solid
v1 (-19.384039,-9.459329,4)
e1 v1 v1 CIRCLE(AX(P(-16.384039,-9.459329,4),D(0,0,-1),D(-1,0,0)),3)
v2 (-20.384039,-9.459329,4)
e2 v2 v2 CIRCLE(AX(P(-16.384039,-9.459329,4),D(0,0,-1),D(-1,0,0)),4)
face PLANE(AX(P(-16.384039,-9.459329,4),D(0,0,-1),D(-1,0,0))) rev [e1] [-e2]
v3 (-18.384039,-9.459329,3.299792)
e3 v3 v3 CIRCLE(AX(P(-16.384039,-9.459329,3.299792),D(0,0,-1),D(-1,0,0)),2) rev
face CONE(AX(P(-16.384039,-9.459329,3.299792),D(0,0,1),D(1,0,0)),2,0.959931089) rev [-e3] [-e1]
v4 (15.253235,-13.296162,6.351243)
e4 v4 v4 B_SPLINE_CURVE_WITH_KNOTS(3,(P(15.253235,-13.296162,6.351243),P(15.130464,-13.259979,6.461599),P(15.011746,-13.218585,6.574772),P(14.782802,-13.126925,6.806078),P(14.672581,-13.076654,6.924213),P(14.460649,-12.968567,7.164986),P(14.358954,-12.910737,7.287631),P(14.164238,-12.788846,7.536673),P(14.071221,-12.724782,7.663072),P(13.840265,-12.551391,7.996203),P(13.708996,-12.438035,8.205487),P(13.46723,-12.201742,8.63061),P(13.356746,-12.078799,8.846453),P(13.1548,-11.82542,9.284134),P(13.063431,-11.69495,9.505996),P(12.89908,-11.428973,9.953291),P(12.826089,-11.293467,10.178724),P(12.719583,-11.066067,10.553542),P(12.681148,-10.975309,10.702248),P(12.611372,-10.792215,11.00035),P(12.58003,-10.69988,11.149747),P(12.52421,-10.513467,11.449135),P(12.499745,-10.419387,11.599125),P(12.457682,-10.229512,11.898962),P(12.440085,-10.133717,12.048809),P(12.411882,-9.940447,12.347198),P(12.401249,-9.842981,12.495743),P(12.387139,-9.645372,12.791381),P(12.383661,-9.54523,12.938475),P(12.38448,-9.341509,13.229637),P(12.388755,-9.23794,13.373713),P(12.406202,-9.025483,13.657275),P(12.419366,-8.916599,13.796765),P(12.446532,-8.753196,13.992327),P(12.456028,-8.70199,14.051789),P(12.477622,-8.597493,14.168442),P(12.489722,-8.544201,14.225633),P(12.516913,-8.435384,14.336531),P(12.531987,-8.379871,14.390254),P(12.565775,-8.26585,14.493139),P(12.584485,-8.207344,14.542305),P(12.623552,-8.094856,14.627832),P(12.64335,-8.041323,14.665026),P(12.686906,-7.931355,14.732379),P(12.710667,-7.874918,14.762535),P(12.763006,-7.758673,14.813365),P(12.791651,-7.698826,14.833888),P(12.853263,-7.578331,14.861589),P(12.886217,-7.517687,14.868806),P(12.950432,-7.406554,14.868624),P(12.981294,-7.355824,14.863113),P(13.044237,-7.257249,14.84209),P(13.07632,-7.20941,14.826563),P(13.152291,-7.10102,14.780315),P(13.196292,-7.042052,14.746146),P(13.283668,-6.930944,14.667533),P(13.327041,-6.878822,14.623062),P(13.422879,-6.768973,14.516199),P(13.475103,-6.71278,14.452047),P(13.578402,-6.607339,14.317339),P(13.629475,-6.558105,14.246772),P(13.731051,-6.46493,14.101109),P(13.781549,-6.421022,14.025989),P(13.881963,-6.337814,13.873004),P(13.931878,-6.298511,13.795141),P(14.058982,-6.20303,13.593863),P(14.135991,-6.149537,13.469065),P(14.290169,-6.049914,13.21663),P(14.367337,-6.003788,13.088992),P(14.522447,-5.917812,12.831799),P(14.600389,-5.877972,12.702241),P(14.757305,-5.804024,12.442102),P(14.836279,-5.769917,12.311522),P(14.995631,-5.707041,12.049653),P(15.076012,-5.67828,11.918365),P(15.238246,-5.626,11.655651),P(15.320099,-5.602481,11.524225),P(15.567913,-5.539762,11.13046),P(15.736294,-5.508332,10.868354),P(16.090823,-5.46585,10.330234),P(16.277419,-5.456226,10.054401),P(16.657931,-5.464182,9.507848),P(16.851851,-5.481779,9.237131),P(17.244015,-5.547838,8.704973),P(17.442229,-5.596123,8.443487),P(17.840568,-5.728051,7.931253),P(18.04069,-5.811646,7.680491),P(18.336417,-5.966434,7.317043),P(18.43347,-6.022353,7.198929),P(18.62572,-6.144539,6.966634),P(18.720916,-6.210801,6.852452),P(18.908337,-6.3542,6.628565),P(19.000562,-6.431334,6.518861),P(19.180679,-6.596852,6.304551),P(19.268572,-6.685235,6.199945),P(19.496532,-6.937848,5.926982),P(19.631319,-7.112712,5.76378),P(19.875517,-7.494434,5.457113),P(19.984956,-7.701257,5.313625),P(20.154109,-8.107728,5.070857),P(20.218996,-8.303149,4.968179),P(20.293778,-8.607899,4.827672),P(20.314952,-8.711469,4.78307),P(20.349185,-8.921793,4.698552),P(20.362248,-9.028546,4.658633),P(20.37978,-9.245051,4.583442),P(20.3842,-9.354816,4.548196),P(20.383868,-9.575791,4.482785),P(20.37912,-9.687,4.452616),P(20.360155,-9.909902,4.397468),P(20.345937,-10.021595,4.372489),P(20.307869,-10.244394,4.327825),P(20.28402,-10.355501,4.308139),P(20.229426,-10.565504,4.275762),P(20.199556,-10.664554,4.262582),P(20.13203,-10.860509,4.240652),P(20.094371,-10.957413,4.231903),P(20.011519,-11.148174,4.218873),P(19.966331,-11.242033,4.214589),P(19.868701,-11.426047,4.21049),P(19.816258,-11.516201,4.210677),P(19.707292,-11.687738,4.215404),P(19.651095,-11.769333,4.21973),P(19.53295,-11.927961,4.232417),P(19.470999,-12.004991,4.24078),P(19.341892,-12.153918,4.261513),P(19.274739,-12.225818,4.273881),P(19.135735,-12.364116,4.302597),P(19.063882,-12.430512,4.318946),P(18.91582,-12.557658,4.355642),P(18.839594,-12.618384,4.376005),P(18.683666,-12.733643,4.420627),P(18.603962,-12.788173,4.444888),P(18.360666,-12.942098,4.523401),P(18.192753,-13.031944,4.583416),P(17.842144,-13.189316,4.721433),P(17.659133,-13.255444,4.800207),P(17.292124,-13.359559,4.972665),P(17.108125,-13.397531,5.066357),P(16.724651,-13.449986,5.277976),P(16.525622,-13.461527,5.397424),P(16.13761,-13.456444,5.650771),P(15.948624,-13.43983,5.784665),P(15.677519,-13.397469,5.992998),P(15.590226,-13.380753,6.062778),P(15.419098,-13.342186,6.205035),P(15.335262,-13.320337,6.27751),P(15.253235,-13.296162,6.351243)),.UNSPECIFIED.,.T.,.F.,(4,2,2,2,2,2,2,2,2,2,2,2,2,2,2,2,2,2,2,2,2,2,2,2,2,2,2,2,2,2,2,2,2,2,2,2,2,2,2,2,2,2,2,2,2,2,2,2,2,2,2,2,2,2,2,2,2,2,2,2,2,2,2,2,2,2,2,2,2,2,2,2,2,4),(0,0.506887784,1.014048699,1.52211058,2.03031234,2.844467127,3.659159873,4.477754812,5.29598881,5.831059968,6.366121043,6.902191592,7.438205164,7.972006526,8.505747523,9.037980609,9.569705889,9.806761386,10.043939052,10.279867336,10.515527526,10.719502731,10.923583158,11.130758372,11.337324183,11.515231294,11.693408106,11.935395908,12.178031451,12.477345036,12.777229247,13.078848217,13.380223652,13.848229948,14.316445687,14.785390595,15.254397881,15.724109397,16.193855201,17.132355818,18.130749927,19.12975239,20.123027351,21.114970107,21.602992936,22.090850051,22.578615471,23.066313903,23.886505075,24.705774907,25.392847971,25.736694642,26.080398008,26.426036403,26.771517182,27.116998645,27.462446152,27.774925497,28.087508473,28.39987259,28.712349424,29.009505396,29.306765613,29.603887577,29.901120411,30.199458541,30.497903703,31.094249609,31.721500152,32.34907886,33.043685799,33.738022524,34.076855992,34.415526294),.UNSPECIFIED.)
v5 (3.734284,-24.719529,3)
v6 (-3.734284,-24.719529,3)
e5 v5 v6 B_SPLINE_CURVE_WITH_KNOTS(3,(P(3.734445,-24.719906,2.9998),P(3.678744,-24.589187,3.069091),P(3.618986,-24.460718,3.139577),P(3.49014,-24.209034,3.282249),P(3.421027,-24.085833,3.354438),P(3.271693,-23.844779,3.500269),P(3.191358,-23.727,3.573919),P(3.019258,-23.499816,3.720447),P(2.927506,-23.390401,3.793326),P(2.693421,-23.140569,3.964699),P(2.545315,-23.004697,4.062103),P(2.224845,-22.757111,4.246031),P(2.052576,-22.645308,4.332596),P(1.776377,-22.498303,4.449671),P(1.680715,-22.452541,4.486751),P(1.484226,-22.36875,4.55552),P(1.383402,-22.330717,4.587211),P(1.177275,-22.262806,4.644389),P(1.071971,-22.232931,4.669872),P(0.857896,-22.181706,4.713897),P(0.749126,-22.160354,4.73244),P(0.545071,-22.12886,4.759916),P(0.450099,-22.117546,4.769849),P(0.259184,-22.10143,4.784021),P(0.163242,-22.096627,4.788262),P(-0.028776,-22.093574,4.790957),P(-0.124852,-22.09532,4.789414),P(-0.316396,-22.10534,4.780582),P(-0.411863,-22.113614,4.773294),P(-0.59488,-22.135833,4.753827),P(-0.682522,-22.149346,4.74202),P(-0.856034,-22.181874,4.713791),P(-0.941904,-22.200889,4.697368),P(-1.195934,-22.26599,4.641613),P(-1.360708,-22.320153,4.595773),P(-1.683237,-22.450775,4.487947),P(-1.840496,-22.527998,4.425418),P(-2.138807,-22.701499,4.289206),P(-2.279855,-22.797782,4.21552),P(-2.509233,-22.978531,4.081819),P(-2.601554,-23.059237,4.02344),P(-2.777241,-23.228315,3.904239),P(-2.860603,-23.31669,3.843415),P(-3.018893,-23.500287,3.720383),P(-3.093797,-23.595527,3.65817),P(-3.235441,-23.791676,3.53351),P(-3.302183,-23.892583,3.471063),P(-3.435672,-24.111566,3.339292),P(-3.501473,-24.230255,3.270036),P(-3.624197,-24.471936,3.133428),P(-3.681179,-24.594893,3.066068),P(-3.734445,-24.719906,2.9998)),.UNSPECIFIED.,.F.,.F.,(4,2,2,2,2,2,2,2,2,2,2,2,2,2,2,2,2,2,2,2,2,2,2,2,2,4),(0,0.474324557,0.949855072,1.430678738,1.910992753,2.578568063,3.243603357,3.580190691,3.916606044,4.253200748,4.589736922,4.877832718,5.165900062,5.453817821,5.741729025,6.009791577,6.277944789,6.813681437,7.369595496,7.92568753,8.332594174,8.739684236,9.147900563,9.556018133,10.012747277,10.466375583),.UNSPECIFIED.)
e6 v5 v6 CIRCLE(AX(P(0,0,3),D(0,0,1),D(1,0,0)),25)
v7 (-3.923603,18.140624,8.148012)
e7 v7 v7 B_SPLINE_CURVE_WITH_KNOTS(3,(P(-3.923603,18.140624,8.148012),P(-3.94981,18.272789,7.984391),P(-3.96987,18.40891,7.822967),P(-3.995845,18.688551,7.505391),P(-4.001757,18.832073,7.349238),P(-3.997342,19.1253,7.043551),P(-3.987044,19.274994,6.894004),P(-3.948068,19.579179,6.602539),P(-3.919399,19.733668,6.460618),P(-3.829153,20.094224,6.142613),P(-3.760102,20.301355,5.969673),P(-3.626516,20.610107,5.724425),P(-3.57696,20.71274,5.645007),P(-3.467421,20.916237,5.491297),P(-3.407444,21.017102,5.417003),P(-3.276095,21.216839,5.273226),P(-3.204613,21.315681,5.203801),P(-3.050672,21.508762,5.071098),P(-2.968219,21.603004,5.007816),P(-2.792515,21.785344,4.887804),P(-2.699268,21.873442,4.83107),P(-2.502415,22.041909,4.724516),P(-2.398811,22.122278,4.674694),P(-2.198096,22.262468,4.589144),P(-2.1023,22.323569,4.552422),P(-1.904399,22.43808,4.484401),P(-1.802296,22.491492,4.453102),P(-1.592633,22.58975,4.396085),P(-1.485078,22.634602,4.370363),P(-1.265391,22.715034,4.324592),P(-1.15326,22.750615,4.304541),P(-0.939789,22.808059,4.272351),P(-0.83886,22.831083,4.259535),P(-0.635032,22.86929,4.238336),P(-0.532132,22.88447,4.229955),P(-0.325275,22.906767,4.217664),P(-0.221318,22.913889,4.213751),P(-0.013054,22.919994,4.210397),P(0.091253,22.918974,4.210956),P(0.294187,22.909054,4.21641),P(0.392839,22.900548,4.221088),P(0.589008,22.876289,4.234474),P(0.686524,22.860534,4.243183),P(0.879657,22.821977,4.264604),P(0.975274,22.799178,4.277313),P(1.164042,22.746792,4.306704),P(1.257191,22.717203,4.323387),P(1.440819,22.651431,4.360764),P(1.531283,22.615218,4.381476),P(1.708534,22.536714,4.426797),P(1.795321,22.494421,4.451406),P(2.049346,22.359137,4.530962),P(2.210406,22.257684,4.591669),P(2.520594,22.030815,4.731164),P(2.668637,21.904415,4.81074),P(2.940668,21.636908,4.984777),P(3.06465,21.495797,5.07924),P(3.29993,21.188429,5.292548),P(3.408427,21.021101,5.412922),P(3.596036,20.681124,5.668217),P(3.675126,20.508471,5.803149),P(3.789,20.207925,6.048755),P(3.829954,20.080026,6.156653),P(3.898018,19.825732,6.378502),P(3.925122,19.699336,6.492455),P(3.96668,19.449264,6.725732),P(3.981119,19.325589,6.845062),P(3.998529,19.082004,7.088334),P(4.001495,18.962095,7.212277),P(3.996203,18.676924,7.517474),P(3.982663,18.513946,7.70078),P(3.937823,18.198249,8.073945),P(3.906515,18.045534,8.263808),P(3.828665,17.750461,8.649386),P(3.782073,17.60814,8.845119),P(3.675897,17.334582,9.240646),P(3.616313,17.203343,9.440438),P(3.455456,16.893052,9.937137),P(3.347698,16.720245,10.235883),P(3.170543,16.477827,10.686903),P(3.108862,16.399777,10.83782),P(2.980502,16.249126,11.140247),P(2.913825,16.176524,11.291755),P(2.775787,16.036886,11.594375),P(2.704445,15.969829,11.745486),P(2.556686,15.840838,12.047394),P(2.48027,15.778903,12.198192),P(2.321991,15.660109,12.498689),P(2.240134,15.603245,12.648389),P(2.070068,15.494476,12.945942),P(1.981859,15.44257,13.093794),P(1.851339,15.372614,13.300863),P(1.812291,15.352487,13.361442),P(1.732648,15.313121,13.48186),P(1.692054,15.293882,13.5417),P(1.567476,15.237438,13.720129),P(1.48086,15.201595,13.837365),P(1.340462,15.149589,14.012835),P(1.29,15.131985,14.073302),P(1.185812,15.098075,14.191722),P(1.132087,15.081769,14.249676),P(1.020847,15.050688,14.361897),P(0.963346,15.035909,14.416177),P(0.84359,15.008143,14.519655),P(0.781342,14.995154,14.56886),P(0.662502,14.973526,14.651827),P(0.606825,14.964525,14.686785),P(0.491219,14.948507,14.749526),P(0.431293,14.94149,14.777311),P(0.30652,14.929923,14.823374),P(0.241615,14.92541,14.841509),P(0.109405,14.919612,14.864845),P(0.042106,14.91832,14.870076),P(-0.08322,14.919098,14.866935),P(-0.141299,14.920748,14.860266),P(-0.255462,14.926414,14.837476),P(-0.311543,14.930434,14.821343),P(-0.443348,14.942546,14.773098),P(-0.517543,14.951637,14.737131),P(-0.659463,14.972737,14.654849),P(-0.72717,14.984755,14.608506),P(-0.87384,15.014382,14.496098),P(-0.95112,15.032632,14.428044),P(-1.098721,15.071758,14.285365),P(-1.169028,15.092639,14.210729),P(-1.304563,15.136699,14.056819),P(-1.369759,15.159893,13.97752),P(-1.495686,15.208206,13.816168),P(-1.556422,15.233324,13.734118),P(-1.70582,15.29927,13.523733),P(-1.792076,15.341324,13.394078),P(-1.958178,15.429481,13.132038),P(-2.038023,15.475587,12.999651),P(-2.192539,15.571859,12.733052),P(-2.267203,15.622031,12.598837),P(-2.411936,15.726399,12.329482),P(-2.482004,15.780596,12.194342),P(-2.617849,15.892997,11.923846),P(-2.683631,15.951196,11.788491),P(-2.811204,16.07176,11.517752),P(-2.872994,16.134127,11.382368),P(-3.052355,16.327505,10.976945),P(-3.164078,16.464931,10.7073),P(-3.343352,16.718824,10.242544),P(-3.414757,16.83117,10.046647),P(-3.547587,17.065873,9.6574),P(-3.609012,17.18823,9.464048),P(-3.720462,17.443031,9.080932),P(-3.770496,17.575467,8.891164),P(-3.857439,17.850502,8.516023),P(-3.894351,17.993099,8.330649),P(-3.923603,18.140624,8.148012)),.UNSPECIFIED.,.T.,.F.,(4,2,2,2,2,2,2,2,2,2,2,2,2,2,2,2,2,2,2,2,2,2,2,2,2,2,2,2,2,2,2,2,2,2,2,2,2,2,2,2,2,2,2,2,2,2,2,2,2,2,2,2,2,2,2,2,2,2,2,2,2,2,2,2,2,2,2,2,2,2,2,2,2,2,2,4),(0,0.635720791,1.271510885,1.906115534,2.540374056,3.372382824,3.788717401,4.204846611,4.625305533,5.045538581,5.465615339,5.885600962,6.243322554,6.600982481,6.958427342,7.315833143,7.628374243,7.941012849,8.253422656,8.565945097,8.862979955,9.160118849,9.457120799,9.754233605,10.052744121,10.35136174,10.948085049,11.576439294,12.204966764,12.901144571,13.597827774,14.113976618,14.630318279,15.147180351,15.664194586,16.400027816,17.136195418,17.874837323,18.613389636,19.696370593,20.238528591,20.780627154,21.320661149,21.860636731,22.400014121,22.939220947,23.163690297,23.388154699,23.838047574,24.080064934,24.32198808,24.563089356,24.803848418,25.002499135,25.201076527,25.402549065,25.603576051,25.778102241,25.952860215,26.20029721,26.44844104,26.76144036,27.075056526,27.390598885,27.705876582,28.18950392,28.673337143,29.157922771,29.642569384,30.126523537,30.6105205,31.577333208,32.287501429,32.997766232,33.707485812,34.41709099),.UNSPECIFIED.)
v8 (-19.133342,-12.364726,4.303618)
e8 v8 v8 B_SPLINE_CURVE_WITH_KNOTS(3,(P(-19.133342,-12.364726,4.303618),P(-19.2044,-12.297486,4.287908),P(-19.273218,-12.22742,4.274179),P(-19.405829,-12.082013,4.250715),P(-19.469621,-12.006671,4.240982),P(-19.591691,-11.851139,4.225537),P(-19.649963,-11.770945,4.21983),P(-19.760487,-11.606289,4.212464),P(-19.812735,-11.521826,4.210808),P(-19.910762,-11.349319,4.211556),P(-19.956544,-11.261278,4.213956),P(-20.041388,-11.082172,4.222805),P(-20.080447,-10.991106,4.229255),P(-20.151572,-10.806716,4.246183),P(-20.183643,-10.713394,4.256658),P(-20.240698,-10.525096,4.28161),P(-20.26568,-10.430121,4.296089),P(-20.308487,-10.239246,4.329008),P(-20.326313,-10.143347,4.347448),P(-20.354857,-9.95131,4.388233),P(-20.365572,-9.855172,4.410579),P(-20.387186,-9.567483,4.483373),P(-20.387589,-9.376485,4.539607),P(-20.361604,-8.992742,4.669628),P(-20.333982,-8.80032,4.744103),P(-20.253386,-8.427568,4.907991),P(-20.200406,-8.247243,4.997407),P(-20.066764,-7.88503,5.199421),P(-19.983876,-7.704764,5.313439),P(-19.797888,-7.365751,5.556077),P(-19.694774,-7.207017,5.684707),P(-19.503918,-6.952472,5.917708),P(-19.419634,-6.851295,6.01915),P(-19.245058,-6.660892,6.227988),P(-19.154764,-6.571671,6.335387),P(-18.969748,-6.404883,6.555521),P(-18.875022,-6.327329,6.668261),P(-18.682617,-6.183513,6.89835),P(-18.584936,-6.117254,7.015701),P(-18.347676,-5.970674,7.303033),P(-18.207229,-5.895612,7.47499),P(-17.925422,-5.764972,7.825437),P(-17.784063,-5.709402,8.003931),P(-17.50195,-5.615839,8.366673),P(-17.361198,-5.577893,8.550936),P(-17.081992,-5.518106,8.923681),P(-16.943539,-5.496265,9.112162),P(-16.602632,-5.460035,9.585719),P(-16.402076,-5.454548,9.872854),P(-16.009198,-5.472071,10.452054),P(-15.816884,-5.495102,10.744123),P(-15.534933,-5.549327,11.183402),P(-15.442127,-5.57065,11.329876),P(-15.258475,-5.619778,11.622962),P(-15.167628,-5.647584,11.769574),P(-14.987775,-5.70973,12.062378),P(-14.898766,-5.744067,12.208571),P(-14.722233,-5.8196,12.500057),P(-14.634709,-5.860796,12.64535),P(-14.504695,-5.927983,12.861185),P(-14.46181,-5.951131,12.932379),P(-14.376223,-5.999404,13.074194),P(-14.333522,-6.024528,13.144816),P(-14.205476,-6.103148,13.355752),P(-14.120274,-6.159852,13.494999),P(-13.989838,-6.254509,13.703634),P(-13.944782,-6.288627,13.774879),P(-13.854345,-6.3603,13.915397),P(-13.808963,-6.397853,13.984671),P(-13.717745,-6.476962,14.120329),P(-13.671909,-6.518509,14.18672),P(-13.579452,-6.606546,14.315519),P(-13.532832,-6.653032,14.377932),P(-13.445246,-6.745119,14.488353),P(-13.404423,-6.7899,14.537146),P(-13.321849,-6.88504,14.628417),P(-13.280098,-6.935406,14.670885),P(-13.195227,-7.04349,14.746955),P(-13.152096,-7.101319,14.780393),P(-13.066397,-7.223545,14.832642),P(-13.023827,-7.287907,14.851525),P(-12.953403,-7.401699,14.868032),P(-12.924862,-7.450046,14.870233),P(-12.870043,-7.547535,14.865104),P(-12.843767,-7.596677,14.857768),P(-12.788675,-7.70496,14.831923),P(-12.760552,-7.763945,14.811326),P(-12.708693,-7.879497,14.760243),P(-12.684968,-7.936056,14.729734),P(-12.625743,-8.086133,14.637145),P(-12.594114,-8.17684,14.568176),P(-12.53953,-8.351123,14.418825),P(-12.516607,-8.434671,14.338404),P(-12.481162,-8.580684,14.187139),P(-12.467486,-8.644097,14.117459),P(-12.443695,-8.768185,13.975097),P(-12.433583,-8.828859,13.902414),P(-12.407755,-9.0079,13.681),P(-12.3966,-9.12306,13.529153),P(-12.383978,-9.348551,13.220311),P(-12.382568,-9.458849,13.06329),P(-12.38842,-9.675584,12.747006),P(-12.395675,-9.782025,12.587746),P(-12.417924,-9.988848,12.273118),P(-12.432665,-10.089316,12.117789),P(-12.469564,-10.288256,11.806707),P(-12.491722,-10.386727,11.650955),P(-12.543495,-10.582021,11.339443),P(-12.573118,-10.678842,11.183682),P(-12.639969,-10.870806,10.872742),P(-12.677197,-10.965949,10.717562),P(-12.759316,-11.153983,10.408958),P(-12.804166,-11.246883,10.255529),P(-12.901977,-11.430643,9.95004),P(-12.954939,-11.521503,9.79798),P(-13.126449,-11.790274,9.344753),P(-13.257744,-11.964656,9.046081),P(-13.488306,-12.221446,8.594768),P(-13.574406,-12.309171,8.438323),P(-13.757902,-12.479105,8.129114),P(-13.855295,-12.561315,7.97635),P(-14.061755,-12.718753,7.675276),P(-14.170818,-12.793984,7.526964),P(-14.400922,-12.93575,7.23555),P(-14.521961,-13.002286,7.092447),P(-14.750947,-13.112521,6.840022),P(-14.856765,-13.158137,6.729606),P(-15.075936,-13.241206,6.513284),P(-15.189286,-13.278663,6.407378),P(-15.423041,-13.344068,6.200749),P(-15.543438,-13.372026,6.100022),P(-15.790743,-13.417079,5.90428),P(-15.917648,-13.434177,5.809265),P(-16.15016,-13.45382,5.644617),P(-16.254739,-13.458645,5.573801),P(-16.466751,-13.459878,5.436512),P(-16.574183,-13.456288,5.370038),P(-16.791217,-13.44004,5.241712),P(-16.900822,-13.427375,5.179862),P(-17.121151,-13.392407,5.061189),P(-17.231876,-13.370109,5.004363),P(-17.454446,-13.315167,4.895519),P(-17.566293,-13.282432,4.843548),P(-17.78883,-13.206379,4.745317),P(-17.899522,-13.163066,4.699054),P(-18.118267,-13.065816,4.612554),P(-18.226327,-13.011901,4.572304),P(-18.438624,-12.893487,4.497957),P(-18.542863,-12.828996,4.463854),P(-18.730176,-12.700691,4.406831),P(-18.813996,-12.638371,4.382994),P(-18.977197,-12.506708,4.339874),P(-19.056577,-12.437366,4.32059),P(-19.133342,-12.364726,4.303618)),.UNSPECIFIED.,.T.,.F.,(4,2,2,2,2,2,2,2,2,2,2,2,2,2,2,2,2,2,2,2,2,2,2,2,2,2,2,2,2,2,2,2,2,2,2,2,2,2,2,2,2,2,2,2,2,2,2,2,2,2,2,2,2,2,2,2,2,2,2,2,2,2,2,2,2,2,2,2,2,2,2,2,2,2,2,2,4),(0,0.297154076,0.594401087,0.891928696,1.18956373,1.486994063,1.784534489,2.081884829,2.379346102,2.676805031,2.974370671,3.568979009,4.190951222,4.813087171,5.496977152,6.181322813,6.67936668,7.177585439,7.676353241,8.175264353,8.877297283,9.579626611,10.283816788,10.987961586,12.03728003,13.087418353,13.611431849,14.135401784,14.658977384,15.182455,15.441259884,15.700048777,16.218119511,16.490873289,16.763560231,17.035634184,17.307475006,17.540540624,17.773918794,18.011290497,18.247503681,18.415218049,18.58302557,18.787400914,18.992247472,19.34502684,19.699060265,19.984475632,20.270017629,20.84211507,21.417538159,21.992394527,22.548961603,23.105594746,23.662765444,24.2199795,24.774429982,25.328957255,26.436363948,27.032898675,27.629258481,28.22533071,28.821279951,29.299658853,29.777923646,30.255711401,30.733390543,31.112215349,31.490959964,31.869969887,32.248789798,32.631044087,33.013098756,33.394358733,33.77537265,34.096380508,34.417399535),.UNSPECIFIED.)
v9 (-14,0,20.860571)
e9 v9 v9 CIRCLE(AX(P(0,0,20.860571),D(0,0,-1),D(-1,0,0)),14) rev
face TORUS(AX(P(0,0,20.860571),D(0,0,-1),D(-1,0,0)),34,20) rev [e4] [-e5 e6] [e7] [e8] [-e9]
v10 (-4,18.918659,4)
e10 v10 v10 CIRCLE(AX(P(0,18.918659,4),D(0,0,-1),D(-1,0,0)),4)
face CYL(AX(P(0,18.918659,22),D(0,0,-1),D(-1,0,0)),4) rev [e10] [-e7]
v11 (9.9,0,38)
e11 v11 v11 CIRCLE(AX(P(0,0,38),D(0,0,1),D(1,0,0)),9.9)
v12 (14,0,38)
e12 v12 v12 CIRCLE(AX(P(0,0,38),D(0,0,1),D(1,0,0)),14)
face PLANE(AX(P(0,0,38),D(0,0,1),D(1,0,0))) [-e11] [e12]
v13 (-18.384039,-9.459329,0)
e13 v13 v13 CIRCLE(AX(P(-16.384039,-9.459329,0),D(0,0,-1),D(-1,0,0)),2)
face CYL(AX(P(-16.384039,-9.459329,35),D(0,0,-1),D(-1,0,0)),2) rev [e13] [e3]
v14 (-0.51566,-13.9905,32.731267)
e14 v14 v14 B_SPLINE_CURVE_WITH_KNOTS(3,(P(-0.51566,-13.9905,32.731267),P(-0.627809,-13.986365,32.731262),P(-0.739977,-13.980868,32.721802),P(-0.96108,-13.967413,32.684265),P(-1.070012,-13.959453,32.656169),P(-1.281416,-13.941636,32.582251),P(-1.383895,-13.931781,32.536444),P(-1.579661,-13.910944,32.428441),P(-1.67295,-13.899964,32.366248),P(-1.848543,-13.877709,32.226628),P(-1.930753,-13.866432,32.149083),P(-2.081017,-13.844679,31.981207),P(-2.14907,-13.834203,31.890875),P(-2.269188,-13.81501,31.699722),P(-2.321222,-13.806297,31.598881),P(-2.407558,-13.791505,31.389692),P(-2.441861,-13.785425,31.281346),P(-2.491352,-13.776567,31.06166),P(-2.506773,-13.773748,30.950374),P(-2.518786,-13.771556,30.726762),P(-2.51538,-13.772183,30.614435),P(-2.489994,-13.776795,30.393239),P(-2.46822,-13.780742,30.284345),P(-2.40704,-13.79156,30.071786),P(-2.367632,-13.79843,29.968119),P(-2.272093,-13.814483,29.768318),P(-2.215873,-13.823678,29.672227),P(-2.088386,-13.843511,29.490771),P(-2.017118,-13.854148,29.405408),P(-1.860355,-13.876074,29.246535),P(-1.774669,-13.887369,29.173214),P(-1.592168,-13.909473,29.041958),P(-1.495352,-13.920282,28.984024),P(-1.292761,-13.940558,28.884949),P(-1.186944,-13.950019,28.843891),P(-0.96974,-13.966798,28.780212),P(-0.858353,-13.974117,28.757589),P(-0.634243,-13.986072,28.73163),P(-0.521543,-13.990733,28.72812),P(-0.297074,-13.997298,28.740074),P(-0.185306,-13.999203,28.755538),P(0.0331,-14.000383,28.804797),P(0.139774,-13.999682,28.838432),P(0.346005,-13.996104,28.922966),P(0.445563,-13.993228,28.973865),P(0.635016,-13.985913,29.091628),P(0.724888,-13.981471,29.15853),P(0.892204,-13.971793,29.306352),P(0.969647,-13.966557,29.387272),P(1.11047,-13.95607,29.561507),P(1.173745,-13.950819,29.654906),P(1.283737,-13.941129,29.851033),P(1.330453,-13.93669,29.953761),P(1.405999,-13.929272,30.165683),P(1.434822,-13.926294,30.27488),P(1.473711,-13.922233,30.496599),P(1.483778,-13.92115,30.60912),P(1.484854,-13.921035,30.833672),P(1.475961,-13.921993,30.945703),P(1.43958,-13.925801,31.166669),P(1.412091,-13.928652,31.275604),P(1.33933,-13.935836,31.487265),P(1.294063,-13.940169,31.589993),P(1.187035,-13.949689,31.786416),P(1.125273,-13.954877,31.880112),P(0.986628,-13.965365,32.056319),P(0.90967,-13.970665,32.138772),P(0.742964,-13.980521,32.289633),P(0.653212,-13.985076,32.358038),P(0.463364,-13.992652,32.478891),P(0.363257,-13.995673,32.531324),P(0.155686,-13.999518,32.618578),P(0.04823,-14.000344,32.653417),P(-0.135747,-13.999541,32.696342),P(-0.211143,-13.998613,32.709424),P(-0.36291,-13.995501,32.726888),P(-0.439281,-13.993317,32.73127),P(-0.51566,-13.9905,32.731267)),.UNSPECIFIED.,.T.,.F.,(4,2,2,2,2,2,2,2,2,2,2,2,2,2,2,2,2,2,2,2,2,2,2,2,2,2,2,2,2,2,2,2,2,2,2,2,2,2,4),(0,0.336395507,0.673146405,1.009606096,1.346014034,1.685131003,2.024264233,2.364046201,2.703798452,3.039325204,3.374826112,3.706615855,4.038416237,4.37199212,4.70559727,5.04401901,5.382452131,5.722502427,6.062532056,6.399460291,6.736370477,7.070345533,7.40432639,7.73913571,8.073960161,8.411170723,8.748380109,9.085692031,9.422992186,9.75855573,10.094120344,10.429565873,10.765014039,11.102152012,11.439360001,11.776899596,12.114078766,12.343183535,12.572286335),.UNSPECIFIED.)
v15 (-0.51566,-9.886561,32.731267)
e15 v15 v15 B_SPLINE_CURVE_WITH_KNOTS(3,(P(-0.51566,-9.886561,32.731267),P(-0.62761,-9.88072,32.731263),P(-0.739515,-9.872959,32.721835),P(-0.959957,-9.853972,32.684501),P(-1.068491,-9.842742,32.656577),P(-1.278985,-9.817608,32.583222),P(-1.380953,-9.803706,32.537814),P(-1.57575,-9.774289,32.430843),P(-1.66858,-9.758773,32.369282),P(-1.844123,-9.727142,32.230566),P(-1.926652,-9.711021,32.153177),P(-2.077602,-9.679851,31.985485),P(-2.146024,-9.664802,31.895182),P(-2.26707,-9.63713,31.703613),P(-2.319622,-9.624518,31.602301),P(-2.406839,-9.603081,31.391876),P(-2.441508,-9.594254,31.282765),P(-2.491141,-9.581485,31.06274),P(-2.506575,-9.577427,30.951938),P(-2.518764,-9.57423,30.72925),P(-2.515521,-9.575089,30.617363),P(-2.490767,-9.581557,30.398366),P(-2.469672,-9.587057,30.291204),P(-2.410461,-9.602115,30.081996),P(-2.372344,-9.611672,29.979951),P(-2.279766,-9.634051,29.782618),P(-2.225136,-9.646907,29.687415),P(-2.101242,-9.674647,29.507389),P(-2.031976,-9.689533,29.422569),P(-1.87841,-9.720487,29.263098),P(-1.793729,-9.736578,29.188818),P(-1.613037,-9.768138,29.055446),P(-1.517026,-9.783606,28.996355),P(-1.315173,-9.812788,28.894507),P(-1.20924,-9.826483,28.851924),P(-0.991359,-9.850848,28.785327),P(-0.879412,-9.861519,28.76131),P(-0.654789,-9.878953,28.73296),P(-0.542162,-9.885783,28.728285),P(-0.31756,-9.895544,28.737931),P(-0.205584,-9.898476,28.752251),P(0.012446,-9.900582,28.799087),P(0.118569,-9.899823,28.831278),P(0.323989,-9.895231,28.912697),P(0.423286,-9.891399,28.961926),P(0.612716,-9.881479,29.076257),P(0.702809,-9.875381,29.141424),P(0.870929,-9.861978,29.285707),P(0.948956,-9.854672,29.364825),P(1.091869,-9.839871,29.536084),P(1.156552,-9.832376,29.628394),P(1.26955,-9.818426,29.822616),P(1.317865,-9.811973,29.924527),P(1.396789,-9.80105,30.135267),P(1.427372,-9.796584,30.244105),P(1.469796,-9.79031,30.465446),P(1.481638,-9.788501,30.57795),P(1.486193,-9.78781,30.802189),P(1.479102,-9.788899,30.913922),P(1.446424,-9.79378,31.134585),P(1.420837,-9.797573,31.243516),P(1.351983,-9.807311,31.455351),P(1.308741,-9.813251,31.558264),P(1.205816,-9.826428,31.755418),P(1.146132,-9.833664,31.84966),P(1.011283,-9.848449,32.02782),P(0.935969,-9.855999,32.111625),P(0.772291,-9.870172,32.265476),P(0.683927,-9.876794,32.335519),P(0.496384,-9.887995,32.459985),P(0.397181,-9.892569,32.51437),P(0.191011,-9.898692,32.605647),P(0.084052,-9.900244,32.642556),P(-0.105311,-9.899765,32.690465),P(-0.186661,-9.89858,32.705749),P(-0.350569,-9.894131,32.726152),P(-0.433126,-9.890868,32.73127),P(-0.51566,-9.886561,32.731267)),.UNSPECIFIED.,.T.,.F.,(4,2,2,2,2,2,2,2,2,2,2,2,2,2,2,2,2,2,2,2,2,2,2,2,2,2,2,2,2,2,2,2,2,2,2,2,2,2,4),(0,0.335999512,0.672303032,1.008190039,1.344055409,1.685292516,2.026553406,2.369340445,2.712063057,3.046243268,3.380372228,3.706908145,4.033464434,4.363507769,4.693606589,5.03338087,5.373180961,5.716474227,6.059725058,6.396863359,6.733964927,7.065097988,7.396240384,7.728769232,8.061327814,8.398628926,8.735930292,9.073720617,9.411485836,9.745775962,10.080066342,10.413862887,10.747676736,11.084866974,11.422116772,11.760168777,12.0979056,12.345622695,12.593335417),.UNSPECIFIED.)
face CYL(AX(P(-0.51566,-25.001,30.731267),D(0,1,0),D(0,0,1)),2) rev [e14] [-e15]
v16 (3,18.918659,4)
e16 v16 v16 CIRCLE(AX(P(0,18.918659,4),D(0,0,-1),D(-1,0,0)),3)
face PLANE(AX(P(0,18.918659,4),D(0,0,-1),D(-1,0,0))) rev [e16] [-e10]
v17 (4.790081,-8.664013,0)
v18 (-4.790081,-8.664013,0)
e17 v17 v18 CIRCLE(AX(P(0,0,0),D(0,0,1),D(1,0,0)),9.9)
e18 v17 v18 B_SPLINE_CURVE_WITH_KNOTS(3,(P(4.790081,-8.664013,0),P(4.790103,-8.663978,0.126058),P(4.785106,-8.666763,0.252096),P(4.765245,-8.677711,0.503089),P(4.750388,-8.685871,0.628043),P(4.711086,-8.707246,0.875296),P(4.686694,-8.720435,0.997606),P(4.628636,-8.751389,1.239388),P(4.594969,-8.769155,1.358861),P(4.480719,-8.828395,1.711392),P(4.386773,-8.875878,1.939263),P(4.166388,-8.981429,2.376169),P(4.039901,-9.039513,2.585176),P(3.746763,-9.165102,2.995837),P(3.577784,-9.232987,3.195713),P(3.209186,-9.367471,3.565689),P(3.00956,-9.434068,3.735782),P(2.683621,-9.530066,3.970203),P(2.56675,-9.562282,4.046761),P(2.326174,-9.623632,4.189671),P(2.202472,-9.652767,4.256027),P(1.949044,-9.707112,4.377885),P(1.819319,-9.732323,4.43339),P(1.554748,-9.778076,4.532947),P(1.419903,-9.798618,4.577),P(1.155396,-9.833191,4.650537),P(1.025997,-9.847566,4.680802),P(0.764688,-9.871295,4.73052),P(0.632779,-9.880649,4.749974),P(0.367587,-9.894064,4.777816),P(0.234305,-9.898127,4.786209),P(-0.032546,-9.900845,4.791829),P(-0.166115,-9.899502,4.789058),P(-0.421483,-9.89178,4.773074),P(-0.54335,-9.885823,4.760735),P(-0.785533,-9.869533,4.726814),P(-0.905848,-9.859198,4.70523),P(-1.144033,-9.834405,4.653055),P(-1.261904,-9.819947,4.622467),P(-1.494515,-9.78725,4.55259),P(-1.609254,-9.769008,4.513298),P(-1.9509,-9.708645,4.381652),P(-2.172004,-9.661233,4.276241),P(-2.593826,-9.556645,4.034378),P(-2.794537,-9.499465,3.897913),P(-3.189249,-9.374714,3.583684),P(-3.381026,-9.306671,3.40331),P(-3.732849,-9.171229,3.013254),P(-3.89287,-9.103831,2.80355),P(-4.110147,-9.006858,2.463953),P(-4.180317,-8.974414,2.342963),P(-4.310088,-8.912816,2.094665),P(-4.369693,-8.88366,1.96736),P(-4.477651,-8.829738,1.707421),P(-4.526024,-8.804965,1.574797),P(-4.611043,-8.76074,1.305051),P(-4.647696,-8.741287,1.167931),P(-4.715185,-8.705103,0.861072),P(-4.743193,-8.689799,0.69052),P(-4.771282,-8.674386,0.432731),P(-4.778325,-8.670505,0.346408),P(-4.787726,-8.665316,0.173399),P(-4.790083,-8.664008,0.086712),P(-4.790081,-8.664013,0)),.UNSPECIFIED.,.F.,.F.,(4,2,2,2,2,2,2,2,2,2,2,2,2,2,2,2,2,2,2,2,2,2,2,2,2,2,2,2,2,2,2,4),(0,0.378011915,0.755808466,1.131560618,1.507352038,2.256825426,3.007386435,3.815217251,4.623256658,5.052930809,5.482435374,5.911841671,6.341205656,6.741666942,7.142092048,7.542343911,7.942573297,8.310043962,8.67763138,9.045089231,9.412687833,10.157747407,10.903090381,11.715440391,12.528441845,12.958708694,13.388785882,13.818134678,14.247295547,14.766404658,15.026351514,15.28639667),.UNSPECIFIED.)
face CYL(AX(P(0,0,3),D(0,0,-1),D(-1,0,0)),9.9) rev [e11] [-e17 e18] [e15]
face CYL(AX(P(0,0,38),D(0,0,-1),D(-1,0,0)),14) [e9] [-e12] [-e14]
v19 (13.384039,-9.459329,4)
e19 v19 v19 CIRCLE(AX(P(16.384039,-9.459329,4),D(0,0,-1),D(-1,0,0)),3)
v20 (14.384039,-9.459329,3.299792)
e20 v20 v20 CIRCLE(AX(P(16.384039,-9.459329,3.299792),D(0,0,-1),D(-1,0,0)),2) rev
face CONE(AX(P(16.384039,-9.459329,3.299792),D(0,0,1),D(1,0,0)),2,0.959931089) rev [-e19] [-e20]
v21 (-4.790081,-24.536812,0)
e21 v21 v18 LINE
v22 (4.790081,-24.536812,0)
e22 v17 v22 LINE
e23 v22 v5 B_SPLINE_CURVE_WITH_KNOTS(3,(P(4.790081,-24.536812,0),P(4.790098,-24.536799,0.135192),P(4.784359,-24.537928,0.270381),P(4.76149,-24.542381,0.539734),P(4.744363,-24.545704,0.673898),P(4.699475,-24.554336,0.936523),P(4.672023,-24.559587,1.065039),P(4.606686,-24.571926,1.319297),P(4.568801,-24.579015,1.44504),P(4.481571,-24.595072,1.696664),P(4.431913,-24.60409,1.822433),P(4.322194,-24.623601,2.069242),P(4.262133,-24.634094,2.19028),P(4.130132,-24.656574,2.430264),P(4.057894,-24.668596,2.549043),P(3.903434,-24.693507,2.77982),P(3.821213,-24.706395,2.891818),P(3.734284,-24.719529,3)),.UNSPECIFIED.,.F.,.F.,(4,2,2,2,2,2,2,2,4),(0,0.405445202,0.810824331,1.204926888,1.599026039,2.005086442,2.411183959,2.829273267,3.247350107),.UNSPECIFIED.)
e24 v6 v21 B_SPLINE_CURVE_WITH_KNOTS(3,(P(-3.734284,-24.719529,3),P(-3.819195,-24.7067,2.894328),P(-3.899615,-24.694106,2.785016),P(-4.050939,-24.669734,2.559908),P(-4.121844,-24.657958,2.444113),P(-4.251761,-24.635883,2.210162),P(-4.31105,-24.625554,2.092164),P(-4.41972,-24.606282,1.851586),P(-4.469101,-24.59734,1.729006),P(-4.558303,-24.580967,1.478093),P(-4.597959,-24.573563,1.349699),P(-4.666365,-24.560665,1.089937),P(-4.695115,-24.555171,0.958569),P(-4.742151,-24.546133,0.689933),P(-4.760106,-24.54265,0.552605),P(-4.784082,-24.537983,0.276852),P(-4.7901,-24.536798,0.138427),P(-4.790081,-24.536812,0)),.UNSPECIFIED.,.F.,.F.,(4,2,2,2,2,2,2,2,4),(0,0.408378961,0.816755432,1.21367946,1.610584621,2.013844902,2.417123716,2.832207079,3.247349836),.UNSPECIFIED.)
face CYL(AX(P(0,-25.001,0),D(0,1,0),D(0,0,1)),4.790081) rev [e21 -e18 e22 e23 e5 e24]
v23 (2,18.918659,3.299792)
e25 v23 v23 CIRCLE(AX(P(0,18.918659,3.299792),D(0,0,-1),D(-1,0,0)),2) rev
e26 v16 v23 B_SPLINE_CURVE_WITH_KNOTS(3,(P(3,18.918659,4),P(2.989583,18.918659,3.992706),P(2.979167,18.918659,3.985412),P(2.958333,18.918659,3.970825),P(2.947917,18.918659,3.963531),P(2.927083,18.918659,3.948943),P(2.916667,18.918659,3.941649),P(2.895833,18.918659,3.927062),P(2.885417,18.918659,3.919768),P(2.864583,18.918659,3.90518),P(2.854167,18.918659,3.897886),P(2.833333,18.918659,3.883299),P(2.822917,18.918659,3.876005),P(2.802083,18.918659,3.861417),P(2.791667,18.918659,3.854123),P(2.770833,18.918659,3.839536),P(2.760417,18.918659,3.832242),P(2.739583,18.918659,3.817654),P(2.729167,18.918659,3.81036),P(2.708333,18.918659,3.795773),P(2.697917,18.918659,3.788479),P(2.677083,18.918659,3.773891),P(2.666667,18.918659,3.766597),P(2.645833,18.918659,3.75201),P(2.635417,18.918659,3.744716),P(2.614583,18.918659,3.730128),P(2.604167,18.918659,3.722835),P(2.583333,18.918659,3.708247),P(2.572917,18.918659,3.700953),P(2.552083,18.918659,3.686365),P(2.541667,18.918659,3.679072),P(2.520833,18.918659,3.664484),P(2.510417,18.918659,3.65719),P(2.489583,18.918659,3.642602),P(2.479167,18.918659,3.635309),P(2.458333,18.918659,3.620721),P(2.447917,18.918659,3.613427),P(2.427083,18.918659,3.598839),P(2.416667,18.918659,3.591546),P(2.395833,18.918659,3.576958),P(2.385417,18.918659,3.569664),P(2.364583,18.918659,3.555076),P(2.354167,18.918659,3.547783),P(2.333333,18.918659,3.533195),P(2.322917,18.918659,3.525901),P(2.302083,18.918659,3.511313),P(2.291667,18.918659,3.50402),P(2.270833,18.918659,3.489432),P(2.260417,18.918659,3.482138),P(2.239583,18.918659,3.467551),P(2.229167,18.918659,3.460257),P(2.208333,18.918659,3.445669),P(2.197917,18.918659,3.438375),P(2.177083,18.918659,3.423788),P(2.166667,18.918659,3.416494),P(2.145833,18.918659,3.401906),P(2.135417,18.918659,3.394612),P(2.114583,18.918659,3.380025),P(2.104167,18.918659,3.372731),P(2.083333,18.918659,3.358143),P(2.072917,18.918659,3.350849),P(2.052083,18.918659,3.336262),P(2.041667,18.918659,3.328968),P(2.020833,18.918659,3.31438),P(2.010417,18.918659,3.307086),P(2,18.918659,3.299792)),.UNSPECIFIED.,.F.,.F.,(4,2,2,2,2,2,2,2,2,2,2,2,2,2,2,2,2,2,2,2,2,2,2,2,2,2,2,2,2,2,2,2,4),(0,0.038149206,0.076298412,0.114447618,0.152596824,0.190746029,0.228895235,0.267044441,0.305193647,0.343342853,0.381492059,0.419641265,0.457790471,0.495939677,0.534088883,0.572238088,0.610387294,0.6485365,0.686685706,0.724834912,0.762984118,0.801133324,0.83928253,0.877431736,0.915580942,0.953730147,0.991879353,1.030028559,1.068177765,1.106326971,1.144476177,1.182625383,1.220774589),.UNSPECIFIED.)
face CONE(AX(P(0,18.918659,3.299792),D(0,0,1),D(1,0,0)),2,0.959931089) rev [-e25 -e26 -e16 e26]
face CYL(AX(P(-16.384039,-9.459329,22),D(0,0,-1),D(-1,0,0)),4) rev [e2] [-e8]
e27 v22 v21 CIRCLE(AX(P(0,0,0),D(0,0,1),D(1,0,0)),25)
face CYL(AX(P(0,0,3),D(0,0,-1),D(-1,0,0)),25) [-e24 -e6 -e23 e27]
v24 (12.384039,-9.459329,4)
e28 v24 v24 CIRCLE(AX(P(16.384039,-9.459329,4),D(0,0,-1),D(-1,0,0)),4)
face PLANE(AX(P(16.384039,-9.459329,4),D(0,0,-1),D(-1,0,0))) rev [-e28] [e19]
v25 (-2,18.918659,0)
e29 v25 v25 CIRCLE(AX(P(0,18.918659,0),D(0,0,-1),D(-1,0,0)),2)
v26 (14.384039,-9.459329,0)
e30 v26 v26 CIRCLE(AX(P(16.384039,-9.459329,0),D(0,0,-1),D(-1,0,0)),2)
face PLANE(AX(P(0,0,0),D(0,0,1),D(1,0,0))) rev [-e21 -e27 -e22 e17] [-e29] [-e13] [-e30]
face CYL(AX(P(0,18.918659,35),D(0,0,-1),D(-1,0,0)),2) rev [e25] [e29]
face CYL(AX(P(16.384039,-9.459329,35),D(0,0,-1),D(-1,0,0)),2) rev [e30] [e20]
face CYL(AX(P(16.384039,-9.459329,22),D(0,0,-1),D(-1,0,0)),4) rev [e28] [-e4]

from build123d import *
from OCP.BRepFilletAPI import BRepFilletAPI_MakeChamfer

# Parameters (mm, degrees)
SKETCH1_R           = 25
SKETCH1_R_2         = 14
SKETCH1_R_3         = 9.9
BOSS_EXTRUDE1_DEPTH = 3
SKETCH2_R           = 14
SKETCH2_R_2         = 9.9
BOSS_EXTRUDE2_DEPTH = 35
FILLET1_R           = 20
SKETCH3_R           = 2
CUT_EXTRUDE1_DEPTH  = 35
CUT_EXTRUDE2_START  = -4
SKETCH4_R           = 4
CUT_EXTRUDE2_DEPTH  = 18
CHAMFER1_SIZE       = 1
CHAMFER1_SIZE2      = 0.700207538
CUT_EXTRUDE3_REACH  = 53.904
SKETCH5_R           = 2
SKETCH5_R_2         = 4.790081367


with BuildPart() as part:
    # Sketch1 → Boss-Extrude1 (new body)
    # profile 1 of 2: a face of its own
    with BuildSketch(Plane.XY):
        Circle(SKETCH1_R)
        Circle(SKETCH1_R_2, mode=Mode.SUBTRACT)
    # profile 2 of 2: a face of its own
    with BuildSketch(Plane.XY):
        Circle(SKETCH1_R_2)
        Circle(SKETCH1_R_3, mode=Mode.SUBTRACT)
    extrude(amount=BOSS_EXTRUDE1_DEPTH)

    # Sketch2 → Boss-Extrude2 (add)
    with BuildSketch(Plane.XY.offset(3)):
        Circle(SKETCH2_R)
        Circle(SKETCH2_R_2, mode=Mode.SUBTRACT)
    extrude(amount=BOSS_EXTRUDE2_DEPTH)

    # Fillet1
    # the kernel refuses this fillet: 20 mm, written as the material it adds along each edge
    with BuildSketch(Plane(origin=(0, 0, 3), x_dir=(1, 0, 0), z_dir=(0, -1, 0))) as fillet1_piece_1:
        with BuildLine():
            CenterArc((34, 17.860571099), FILLET1_R, 180, 63.25631605)
            Line((14, 17.860571099), (13.6, 17.860571099))
            Line((13.6, 17.860571099), (13.6, 0))
            Line((13.6, 0), (14, -0.4))
            ThreePointArc((14, -0.4), (19.5, -0.4), (24.82, -0.357211422))
            Line((24.82, -0.357211422), (25, 0))
        make_face()
    revolve(axis=Axis((0, 0, 3), (0, 0, 1)))

    # Sketch3 → Cut-Extrude1 (cut)
    with BuildSketch(Plane(origin=(0, 0, 0), x_dir=(-1, 0, 0), z_dir=(0, 0, -1))):
        with Locations((0, 18.918658527)):
            Circle(SKETCH3_R)
        with Locations((16.38403889, -9.459329263)):
            Circle(SKETCH3_R)
        with Locations((-16.38403889, -9.459329263)):
            Circle(SKETCH3_R)
    extrude(amount=-CUT_EXTRUDE1_DEPTH, mode=Mode.SUBTRACT)

    # Sketch4 → Cut-Extrude2 (cut)
    with BuildSketch(Plane(origin=(0, 0, 0), x_dir=(-1, 0, 0), z_dir=(0, 0, -1)).offset(CUT_EXTRUDE2_START)):
        with Locations((-16.38403889, -9.459329263)):
            Circle(SKETCH4_R)
        with Locations((0, 18.918658527)):
            Circle(SKETCH4_R)
        with Locations((16.38403889, -9.459329263)):
            Circle(SKETCH4_R)
    extrude(amount=-CUT_EXTRUDE2_DEPTH, mode=Mode.SUBTRACT)

    # Chamfer1: one chamfer whose edges measure the first distance from different faces: ONE call of the kernel's chamfer builder (chamfer() names one face for all edges)
    chamfer1_edges_1 = [part.edges().sort_by_distance(p)[0] for p in [
        (18.38403889, -9.459329263, 4),
    ]]
    chamfer1_side_1 = [part.faces().sort_by_distance(p)[0] for p in [
        (20.270901805, -9.459329263, 4),
    ]]
    chamfer1_edges_2 = [part.edges().sort_by_distance(p)[0] for p in [
        (2, 18.918658527, 4),
    ]]
    chamfer1_side_2 = [part.faces().sort_by_distance(p)[0] for p in [
        (3.886862915, 18.918658527, 4),
    ]]
    chamfer1_edges_3 = [part.edges().sort_by_distance(p)[0] for p in [
        (-14.38403889, -9.459329263, 4),
    ]]
    chamfer1_side_3 = [part.faces().sort_by_distance(p)[0] for p in [
        (-12.497175975, -9.459329263, 4),
    ]]
    chamfer1 = BRepFilletAPI_MakeChamfer(part.part.solid().wrapped)
    for e in chamfer1_edges_1:
        chamfer1.Add(CHAMFER1_SIZE, CHAMFER1_SIZE2, e.wrapped, chamfer1_side_1[0].wrapped)  # the first distance lies on this face
    for e in chamfer1_edges_2:
        chamfer1.Add(CHAMFER1_SIZE, CHAMFER1_SIZE2, e.wrapped, chamfer1_side_2[0].wrapped)  # the first distance lies on this face
    for e in chamfer1_edges_3:
        chamfer1.Add(CHAMFER1_SIZE, CHAMFER1_SIZE2, e.wrapped, chamfer1_side_3[0].wrapped)  # the first distance lies on this face
    add(Compound.cast(chamfer1.Shape()), mode=Mode.REPLACE)

    # Sketch5 → Cut-Extrude3 (cut, up to next)
    with BuildSketch(Plane(origin=(0, 0, 0), x_dir=(1, 0, 0), z_dir=(0, 1, 0)), mode=Mode.PRIVATE) as cut_extrude3_sk1:
        with Locations(Location((-0.515660085, -30.731266932, 0), (0, 0, 270))):
            Circle(SKETCH5_R)
    cut_extrude3_tool1 = extrude(cut_extrude3_sk1.sketch, amount=-CUT_EXTRUDE3_REACH, mode=Mode.PRIVATE) & part.part
    # Sketch5 → Cut-Extrude3 (cut, up to next)
    with BuildSketch(Plane(origin=(0, 0, 0), x_dir=(1, 0, 0), z_dir=(0, 1, 0)), mode=Mode.PRIVATE) as cut_extrude3_sk2:
        Circle(SKETCH5_R_2)
    cut_extrude3_tool2 = extrude(cut_extrude3_sk2.sketch, amount=-CUT_EXTRUDE3_REACH, mode=Mode.PRIVATE) & part.part
    add(cut_extrude3_tool1.solids().sort_by_distance((-0.51566, 0, 30.731267))[0], mode=Mode.SUBTRACT)
    add(cut_extrude3_tool2.solids().sort_by_distance((0, 0, 0))[0], mode=Mode.SUBTRACT)


solid = part.part
